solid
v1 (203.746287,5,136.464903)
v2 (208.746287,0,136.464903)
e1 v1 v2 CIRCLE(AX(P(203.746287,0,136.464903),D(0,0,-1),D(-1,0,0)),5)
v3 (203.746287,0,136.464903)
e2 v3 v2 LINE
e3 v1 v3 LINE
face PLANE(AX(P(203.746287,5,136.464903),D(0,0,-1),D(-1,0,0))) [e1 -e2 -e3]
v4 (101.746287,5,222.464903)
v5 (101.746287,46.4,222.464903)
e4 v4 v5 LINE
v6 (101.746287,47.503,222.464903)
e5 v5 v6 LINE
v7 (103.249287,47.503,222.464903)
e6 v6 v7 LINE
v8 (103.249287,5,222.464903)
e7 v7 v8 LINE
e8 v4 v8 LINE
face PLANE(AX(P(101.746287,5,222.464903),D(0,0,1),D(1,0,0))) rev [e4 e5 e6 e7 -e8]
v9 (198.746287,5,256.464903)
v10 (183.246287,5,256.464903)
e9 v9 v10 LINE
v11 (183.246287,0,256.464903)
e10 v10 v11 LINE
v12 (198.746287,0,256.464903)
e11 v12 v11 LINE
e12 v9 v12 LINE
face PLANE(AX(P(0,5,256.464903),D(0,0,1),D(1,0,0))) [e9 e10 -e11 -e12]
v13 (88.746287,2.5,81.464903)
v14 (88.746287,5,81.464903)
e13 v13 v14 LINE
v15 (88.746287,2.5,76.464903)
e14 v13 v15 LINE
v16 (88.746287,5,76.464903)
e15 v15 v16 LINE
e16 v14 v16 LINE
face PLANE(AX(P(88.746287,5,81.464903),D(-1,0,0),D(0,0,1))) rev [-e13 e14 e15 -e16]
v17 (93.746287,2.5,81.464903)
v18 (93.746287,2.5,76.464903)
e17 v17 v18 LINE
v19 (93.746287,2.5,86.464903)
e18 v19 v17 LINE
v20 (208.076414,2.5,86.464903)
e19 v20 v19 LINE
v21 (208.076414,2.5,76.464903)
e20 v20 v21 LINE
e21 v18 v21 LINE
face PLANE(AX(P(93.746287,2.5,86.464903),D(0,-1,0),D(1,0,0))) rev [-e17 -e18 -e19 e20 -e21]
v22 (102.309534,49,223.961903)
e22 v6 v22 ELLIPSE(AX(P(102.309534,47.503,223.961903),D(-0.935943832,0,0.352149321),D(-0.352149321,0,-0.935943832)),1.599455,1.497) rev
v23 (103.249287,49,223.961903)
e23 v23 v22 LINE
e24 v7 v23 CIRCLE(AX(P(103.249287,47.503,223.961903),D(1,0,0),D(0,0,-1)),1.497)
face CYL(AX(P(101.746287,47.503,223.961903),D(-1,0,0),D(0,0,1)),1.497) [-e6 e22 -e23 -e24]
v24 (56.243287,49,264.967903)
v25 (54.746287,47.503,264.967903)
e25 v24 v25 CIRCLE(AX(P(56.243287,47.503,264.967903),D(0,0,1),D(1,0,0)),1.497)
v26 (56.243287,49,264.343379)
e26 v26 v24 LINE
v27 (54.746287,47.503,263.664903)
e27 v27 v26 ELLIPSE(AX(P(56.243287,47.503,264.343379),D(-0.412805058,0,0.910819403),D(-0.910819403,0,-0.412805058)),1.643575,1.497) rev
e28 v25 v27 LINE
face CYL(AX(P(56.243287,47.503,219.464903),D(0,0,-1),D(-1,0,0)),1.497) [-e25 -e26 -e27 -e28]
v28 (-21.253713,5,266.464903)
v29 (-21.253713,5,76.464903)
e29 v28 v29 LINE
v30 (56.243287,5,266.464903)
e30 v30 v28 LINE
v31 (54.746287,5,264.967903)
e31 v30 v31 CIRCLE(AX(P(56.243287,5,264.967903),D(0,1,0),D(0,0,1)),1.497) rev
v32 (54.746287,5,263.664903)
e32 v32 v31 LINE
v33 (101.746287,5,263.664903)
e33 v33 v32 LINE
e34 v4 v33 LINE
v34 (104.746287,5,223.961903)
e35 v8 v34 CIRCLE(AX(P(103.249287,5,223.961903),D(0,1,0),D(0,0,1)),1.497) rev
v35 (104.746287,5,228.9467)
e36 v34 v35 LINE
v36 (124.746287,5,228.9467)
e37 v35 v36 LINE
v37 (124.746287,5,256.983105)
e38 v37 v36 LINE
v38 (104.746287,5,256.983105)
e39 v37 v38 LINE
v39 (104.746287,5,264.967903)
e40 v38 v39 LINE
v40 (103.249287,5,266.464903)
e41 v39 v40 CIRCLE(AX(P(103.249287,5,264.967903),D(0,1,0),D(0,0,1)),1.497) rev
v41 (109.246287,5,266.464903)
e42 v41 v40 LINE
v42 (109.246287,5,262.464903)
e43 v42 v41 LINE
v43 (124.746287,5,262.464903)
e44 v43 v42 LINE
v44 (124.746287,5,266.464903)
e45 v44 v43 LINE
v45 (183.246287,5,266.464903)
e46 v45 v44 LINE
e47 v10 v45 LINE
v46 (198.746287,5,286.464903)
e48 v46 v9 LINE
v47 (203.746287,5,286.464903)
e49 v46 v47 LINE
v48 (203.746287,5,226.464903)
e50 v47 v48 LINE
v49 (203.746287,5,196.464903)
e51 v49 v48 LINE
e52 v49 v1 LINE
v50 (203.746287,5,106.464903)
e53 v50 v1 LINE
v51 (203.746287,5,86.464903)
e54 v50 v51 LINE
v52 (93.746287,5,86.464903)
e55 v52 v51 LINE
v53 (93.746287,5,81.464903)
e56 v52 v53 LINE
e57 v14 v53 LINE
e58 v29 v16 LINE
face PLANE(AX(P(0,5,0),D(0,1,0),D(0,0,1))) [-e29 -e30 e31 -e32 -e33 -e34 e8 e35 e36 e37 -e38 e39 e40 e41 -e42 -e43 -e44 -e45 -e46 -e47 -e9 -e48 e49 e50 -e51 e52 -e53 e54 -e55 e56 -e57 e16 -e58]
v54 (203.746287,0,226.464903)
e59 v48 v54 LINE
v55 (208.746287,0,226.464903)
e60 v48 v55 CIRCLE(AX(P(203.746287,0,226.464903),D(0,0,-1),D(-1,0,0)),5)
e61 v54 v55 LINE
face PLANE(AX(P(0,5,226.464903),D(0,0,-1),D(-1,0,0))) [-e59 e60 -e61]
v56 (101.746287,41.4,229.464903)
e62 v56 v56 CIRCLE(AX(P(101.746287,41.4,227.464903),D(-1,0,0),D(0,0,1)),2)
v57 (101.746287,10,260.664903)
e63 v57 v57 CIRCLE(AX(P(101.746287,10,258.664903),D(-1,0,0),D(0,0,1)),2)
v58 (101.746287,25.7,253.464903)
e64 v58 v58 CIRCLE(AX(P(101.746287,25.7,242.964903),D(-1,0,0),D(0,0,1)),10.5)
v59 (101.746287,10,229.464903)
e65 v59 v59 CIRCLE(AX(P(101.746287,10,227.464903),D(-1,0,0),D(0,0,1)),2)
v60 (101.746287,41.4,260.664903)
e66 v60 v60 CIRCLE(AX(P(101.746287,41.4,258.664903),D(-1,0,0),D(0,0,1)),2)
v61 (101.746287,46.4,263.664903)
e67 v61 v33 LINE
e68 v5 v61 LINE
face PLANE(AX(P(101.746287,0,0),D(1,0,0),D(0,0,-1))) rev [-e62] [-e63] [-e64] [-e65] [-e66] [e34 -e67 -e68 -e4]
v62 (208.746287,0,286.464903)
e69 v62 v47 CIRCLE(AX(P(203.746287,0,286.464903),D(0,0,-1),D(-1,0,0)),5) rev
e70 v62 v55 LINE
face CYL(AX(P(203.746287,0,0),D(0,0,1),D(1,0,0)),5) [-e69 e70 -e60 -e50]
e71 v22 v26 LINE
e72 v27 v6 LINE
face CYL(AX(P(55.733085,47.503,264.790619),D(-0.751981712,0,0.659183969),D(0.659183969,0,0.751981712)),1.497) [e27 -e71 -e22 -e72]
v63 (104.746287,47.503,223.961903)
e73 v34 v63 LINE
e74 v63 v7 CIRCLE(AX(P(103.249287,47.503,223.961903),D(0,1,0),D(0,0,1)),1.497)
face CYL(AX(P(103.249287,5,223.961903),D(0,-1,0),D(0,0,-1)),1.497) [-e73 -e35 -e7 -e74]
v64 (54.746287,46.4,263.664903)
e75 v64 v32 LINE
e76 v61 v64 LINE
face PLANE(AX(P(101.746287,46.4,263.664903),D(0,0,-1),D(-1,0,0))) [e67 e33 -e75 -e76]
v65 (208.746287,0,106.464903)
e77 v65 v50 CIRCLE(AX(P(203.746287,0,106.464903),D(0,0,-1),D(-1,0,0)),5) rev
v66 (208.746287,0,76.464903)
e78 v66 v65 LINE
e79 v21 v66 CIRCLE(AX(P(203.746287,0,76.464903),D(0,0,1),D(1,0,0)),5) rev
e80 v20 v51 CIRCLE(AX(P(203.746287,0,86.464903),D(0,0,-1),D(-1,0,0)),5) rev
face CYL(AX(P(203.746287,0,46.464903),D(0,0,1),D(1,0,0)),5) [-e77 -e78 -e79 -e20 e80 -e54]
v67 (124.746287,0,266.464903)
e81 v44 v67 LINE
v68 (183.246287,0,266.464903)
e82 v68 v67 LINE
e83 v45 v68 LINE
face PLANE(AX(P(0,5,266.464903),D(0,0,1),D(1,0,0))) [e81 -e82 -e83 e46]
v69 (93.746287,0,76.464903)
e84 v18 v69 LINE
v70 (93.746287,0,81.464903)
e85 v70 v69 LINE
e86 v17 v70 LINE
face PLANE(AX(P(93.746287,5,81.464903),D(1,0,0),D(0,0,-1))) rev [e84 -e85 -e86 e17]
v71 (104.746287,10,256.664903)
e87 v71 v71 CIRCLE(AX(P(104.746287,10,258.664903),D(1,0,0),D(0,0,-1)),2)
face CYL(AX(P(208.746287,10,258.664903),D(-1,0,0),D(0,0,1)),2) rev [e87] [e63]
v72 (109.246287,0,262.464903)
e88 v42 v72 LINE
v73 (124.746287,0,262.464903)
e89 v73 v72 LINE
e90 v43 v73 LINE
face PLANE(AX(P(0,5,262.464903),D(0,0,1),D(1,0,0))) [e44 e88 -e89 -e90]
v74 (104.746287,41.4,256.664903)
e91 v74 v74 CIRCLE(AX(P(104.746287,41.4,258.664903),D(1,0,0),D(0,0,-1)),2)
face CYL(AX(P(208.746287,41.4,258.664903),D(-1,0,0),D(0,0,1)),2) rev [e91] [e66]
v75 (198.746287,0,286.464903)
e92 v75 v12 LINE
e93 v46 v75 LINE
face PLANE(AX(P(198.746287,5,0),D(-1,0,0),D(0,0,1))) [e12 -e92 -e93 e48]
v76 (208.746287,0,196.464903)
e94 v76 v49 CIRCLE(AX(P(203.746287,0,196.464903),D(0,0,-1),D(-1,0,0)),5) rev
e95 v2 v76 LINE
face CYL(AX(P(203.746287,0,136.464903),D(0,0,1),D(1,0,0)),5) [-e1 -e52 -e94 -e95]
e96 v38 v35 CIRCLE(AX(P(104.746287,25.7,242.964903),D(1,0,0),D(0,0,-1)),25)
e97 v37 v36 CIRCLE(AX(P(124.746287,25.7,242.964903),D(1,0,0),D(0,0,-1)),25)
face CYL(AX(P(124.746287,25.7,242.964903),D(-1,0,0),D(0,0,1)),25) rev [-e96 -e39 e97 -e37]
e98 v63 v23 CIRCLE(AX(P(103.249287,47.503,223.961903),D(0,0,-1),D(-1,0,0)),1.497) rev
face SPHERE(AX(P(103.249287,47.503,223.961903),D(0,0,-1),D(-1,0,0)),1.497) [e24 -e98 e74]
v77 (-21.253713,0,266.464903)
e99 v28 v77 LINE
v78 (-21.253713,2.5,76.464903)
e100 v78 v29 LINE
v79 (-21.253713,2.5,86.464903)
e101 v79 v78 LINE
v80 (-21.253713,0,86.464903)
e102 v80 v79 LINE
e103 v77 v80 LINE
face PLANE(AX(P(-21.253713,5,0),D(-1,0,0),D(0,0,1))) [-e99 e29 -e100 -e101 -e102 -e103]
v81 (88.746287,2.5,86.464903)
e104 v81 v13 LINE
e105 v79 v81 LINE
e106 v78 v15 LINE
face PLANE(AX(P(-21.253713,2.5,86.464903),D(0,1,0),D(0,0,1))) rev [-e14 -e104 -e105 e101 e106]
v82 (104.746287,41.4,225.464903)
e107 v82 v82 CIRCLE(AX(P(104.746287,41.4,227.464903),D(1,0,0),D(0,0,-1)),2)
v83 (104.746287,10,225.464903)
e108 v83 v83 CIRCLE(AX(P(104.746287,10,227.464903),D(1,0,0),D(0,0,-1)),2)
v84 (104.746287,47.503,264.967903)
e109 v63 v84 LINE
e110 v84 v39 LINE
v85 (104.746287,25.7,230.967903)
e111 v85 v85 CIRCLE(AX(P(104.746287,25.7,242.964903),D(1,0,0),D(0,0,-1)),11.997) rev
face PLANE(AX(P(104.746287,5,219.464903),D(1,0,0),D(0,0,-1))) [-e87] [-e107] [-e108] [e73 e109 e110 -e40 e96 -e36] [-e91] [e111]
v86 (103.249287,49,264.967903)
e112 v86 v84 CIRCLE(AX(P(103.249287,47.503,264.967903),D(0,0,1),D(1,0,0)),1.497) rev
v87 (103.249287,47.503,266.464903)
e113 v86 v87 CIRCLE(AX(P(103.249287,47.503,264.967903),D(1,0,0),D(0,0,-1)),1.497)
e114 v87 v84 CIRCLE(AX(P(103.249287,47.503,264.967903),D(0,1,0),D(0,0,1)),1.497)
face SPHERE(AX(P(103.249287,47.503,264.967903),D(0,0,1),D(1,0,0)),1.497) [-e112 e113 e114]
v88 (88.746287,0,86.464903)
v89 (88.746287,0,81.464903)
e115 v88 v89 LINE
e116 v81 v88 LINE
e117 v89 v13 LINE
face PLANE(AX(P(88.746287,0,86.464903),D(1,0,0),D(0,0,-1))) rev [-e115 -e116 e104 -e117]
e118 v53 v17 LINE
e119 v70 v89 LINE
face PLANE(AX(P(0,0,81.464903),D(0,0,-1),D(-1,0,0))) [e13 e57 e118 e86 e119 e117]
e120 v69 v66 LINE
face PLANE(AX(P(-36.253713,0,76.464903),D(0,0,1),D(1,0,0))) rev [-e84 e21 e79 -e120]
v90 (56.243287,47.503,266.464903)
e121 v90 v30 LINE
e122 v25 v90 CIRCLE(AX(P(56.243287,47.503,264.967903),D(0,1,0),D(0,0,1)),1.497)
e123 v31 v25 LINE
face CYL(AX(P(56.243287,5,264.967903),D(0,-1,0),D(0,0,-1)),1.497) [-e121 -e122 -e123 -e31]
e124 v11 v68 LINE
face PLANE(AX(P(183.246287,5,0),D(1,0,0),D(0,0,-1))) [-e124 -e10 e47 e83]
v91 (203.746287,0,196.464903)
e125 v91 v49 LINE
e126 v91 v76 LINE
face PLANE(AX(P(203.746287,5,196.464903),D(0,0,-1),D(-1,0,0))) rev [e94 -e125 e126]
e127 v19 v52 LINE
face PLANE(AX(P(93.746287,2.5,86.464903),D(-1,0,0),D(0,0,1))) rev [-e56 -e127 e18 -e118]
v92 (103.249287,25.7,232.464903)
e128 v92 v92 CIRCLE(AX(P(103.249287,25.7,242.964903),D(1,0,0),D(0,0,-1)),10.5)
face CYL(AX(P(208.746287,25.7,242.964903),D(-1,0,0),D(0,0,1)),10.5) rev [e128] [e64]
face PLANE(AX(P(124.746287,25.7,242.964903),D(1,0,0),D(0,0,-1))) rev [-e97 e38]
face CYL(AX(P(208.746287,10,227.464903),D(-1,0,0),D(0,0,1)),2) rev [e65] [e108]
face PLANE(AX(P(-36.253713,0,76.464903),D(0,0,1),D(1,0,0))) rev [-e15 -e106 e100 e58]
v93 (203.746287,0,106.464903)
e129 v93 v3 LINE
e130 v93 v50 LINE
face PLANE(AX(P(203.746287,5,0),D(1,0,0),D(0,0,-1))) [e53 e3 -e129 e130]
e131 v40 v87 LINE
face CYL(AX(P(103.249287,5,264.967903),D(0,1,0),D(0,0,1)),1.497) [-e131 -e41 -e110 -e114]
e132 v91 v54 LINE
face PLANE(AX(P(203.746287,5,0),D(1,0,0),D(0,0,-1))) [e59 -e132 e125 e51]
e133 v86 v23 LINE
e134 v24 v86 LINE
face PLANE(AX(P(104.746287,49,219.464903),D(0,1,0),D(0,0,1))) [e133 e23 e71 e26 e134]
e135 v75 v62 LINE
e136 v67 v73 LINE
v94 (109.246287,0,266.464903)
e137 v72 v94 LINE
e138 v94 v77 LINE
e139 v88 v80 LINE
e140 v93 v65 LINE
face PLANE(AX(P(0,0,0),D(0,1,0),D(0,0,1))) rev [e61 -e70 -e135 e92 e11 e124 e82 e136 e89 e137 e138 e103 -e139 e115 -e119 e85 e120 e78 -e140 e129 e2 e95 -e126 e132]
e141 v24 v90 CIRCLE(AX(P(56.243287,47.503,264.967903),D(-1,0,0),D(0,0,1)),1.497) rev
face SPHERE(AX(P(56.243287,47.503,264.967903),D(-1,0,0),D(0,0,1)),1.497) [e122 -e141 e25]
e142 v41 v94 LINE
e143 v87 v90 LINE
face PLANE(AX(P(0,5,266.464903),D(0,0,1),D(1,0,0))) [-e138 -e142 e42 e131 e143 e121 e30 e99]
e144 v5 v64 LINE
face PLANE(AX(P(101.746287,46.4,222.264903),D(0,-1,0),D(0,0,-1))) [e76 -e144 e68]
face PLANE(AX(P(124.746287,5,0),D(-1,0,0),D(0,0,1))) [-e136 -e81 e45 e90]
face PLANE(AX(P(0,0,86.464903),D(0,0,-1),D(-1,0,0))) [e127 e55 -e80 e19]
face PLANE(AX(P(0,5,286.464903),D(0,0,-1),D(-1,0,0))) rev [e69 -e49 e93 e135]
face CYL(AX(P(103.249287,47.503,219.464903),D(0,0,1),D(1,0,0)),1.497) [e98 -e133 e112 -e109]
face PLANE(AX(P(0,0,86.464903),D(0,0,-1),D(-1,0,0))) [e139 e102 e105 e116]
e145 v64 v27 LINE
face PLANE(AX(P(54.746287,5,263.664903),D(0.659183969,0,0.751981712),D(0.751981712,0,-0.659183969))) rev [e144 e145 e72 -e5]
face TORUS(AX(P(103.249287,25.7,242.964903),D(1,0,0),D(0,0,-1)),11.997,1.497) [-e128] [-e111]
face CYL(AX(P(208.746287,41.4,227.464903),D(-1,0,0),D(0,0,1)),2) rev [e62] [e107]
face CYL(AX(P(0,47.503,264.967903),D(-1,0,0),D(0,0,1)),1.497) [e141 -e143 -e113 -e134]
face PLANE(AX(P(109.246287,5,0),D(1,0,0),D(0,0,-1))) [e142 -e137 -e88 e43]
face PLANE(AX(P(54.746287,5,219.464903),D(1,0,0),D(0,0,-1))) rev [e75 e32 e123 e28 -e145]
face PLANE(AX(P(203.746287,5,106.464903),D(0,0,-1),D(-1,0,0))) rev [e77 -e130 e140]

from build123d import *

# Parameters (mm, degrees)
SKETCH_1_W          = 5
SKETCH_1_H          = 60
SKETCH_1_W_2        = 30
SKETCH_1_H_2        = 5
SKETCH_1_W_3        = 15
EXTRUDE_1_DEPTH     = 5
FILLET_1_R          = 5
SKETCH_2_W          = 245
SKETCH_2_H          = 125
CUT_EXTRUDE_1_DEPTH = 5
SKETCH_3_W          = 110
SKETCH_3_H          = 2.5
SKETCH_3_W_2        = 115
CUT_EXTRUDE_2_DEPTH = 10
SKETCH_4_W          = 5
SKETCH_4_H          = 5
CUT_EXTRUDE_3_DEPTH = 5
SKETCH_5_W          = 50
SKETCH_5_H          = 44
EXTRUDE_2_DEPTH     = 47
SKETCH_6_W          = 41.4
SKETCH_6_H          = 41.4
CUT_EXTRUDE_4_DEPTH = 47
SKETCH_7_R          = 10.5
CUT_EXTRUDE_5_DEPTH = 316.582224557
CUT_EXTRUDE_6_DEPTH = 44
SKETCH_10_R         = 2
CUT_EXTRUDE_7_DEPTH = 316.582224557
SKETCH_13_R         = 25
CUT_EXTRUDE_9_DEPTH = 20
FILLET_11_R         = 1.497


with BuildPart() as part:
    # 草圖1 → 填料-伸長1 (new body)
    with BuildSketch(Plane(origin=(0, 0, 0), x_dir=(1, 0, 0), z_dir=(0, 1, 0))):
        Polygon((198.746286718, -286.464902661), (198.746286718, -256.464902661), (183.246286718, -256.464902661), (183.246286718, -266.464902661), (124.746286718, -266.464902661), (124.746286718, -262.464902661), (109.246286718, -262.464902661), (109.246286718, -266.464902661), (-21.253713282, -266.464902661), (-21.253713282, 38.535097339), (-36.253713282, 38.535097339), (-36.253713282, 43.535097339), (203.746286718, 43.535097339), (203.746286718, -286.464902661), align=None)
        with Locations((206.246286718, -256.464902661)):
            Rectangle(SKETCH_1_W, SKETCH_1_H)
        with Locations((206.246286718, 13.535097339)):
            Rectangle(SKETCH_1_W, SKETCH_1_H)
        with Locations((188.746286718, 46.035097339)):
            Rectangle(SKETCH_1_W_2, SKETCH_1_H_2)
        with Locations((-21.253713282, 46.035097339)):
            Rectangle(SKETCH_1_W_2, SKETCH_1_H_2)
        with Locations((91.246286718, 46.035097339)):
            Rectangle(SKETCH_1_W_3, SKETCH_1_H_2)
        with Locations((76.246286718, 46.035097339)):
            Rectangle(SKETCH_1_W_3, SKETCH_1_H_2)
        with Locations((206.246286718, -166.464902661)):
            Rectangle(SKETCH_1_W, SKETCH_1_H)
        with Locations((206.246286718, -76.464902661)):
            Rectangle(SKETCH_1_W, SKETCH_1_H)
    extrude(amount=EXTRUDE_1_DEPTH)

    # 圓角1
    fillet_1_edges = [part.edges().sort_by_distance(p)[0] for p in [
        (208.746286718, 5, -13.535097339),
        (208.746286718, 5, 76.464902661),
        (208.746286718, 5, 166.464902661),
        (208.746286718, 5, 256.464902661),
    ]]
    fillet(fillet_1_edges, radius=FILLET_1_R - 0.0001)  # a hair under: the kernel refuses the full size

    # 草圖2 → 除料-伸長1 (cut)
    with BuildSketch(Plane(origin=(0, 5, 0), x_dir=(1, 0, 0), z_dir=(0, 1, 0))):
        with Locations((86.246286718, -13.964902661)):
            Rectangle(SKETCH_2_W, SKETCH_2_H)
    extrude(amount=-CUT_EXTRUDE_1_DEPTH, mode=Mode.SUBTRACT)

    # 草圖3 → 除料-伸長2 (cut)
    with BuildSketch(Plane(origin=(0, 0, 76.464902661), x_dir=(-1, 0, 0), z_dir=(0, 0, -1))):
        with Locations((-33.746286718, 1.25)):
            Rectangle(SKETCH_3_W, SKETCH_3_H)
        with Locations((-151.246286718, 3.75)):
            Rectangle(SKETCH_3_W_2, SKETCH_3_H)
    extrude(amount=-CUT_EXTRUDE_2_DEPTH, mode=Mode.SUBTRACT)

    # 草圖4 → 除料-伸長3 (cut)
    with BuildSketch(Plane(origin=(0, 0, 76.464902661), x_dir=(-1, 0, 0), z_dir=(0, 0, -1))):
        with Locations((-91.246286718, 2.5)):
            Rectangle(SKETCH_4_W, SKETCH_4_H)
    extrude(amount=-CUT_EXTRUDE_3_DEPTH, mode=Mode.SUBTRACT)

    # 草圖5 → 填料-伸長2 (add)
    with BuildSketch(Plane.XY.offset(266.464902661)):
        with Locations((79.746286718, 27)):
            Rectangle(SKETCH_5_W, SKETCH_5_H)
    extrude(amount=-EXTRUDE_2_DEPTH)

    # 草圖6 → 除料-伸長4 (cut)
    with BuildSketch(Plane.ZY.offset(-54.746286718)):
        with Locations((242.964902661, 25.7)):
            Rectangle(SKETCH_6_W, SKETCH_6_H)
    extrude(amount=-CUT_EXTRUDE_4_DEPTH, mode=Mode.SUBTRACT)

    # 草圖7 → 除料-伸長5 (cut, through all)
    with BuildSketch(Plane.ZY.offset(-101.746286718)):
        with Locations((242.964902661, 25.7)):
            Circle(SKETCH_7_R)
    extrude(amount=-CUT_EXTRUDE_5_DEPTH, mode=Mode.SUBTRACT)

    # 草圖8 → 除料-伸長6 (cut)
    with BuildSketch(Plane(origin=(0, 49, 0), x_dir=(1, 0, 0), z_dir=(0, 1, 0))):
        Polygon((54.746286718, -263.664902661), (101.746286718, -222.464902661), (104.746286718, -222.464902661), (104.746286718, -219.464902661), (54.746286718, -219.464902661), align=None)
    extrude(amount=-CUT_EXTRUDE_6_DEPTH, mode=Mode.SUBTRACT)

    # 草圖10 → 除料-伸長7 (cut, through all)
    with BuildSketch(Plane.ZY.offset(-101.746286718)):
        with Locations((227.464902661, 41.4)):
            Circle(SKETCH_10_R)
        with Locations((258.664902661, 41.4)):
            Circle(SKETCH_10_R)
        with Locations((258.664902661, 10)):
            Circle(SKETCH_10_R)
        with Locations((227.464902661, 10)):
            Circle(SKETCH_10_R)
    extrude(amount=-CUT_EXTRUDE_7_DEPTH, mode=Mode.SUBTRACT)

    # 草圖13 → 除料-伸長9 (cut)
    with BuildSketch(Plane(origin=(104.746286718, 0, 0), x_dir=(0, 0, -1), z_dir=(1, 0, 0))):
        with Locations((-242.964902661, 25.7)):
            Circle(SKETCH_13_R)
    extrude(amount=CUT_EXTRUDE_9_DEPTH, mode=Mode.SUBTRACT)

    # 圓角11
    fillet_11_edges = [part.edges().sort_by_distance(p)[0] for p in [
        (54.746286718, 27, 266.464902661),
        (79.746286718, 49, 266.464902661),
        (104.746286718, 27, 266.464902661),
        (104.746286718, 25.7, 232.464902661),
        (54.746286718, 49, 265.064902661),
        (104.746286718, 49, 244.464902661),
        (104.746286718, 27, 222.464902661),
        (78.246286718, 49, 243.064902661),
        (103.246286718, 49, 222.464902661),
    ]]
    fillet(fillet_11_edges, radius=FILLET_11_R)


solid = part.part
